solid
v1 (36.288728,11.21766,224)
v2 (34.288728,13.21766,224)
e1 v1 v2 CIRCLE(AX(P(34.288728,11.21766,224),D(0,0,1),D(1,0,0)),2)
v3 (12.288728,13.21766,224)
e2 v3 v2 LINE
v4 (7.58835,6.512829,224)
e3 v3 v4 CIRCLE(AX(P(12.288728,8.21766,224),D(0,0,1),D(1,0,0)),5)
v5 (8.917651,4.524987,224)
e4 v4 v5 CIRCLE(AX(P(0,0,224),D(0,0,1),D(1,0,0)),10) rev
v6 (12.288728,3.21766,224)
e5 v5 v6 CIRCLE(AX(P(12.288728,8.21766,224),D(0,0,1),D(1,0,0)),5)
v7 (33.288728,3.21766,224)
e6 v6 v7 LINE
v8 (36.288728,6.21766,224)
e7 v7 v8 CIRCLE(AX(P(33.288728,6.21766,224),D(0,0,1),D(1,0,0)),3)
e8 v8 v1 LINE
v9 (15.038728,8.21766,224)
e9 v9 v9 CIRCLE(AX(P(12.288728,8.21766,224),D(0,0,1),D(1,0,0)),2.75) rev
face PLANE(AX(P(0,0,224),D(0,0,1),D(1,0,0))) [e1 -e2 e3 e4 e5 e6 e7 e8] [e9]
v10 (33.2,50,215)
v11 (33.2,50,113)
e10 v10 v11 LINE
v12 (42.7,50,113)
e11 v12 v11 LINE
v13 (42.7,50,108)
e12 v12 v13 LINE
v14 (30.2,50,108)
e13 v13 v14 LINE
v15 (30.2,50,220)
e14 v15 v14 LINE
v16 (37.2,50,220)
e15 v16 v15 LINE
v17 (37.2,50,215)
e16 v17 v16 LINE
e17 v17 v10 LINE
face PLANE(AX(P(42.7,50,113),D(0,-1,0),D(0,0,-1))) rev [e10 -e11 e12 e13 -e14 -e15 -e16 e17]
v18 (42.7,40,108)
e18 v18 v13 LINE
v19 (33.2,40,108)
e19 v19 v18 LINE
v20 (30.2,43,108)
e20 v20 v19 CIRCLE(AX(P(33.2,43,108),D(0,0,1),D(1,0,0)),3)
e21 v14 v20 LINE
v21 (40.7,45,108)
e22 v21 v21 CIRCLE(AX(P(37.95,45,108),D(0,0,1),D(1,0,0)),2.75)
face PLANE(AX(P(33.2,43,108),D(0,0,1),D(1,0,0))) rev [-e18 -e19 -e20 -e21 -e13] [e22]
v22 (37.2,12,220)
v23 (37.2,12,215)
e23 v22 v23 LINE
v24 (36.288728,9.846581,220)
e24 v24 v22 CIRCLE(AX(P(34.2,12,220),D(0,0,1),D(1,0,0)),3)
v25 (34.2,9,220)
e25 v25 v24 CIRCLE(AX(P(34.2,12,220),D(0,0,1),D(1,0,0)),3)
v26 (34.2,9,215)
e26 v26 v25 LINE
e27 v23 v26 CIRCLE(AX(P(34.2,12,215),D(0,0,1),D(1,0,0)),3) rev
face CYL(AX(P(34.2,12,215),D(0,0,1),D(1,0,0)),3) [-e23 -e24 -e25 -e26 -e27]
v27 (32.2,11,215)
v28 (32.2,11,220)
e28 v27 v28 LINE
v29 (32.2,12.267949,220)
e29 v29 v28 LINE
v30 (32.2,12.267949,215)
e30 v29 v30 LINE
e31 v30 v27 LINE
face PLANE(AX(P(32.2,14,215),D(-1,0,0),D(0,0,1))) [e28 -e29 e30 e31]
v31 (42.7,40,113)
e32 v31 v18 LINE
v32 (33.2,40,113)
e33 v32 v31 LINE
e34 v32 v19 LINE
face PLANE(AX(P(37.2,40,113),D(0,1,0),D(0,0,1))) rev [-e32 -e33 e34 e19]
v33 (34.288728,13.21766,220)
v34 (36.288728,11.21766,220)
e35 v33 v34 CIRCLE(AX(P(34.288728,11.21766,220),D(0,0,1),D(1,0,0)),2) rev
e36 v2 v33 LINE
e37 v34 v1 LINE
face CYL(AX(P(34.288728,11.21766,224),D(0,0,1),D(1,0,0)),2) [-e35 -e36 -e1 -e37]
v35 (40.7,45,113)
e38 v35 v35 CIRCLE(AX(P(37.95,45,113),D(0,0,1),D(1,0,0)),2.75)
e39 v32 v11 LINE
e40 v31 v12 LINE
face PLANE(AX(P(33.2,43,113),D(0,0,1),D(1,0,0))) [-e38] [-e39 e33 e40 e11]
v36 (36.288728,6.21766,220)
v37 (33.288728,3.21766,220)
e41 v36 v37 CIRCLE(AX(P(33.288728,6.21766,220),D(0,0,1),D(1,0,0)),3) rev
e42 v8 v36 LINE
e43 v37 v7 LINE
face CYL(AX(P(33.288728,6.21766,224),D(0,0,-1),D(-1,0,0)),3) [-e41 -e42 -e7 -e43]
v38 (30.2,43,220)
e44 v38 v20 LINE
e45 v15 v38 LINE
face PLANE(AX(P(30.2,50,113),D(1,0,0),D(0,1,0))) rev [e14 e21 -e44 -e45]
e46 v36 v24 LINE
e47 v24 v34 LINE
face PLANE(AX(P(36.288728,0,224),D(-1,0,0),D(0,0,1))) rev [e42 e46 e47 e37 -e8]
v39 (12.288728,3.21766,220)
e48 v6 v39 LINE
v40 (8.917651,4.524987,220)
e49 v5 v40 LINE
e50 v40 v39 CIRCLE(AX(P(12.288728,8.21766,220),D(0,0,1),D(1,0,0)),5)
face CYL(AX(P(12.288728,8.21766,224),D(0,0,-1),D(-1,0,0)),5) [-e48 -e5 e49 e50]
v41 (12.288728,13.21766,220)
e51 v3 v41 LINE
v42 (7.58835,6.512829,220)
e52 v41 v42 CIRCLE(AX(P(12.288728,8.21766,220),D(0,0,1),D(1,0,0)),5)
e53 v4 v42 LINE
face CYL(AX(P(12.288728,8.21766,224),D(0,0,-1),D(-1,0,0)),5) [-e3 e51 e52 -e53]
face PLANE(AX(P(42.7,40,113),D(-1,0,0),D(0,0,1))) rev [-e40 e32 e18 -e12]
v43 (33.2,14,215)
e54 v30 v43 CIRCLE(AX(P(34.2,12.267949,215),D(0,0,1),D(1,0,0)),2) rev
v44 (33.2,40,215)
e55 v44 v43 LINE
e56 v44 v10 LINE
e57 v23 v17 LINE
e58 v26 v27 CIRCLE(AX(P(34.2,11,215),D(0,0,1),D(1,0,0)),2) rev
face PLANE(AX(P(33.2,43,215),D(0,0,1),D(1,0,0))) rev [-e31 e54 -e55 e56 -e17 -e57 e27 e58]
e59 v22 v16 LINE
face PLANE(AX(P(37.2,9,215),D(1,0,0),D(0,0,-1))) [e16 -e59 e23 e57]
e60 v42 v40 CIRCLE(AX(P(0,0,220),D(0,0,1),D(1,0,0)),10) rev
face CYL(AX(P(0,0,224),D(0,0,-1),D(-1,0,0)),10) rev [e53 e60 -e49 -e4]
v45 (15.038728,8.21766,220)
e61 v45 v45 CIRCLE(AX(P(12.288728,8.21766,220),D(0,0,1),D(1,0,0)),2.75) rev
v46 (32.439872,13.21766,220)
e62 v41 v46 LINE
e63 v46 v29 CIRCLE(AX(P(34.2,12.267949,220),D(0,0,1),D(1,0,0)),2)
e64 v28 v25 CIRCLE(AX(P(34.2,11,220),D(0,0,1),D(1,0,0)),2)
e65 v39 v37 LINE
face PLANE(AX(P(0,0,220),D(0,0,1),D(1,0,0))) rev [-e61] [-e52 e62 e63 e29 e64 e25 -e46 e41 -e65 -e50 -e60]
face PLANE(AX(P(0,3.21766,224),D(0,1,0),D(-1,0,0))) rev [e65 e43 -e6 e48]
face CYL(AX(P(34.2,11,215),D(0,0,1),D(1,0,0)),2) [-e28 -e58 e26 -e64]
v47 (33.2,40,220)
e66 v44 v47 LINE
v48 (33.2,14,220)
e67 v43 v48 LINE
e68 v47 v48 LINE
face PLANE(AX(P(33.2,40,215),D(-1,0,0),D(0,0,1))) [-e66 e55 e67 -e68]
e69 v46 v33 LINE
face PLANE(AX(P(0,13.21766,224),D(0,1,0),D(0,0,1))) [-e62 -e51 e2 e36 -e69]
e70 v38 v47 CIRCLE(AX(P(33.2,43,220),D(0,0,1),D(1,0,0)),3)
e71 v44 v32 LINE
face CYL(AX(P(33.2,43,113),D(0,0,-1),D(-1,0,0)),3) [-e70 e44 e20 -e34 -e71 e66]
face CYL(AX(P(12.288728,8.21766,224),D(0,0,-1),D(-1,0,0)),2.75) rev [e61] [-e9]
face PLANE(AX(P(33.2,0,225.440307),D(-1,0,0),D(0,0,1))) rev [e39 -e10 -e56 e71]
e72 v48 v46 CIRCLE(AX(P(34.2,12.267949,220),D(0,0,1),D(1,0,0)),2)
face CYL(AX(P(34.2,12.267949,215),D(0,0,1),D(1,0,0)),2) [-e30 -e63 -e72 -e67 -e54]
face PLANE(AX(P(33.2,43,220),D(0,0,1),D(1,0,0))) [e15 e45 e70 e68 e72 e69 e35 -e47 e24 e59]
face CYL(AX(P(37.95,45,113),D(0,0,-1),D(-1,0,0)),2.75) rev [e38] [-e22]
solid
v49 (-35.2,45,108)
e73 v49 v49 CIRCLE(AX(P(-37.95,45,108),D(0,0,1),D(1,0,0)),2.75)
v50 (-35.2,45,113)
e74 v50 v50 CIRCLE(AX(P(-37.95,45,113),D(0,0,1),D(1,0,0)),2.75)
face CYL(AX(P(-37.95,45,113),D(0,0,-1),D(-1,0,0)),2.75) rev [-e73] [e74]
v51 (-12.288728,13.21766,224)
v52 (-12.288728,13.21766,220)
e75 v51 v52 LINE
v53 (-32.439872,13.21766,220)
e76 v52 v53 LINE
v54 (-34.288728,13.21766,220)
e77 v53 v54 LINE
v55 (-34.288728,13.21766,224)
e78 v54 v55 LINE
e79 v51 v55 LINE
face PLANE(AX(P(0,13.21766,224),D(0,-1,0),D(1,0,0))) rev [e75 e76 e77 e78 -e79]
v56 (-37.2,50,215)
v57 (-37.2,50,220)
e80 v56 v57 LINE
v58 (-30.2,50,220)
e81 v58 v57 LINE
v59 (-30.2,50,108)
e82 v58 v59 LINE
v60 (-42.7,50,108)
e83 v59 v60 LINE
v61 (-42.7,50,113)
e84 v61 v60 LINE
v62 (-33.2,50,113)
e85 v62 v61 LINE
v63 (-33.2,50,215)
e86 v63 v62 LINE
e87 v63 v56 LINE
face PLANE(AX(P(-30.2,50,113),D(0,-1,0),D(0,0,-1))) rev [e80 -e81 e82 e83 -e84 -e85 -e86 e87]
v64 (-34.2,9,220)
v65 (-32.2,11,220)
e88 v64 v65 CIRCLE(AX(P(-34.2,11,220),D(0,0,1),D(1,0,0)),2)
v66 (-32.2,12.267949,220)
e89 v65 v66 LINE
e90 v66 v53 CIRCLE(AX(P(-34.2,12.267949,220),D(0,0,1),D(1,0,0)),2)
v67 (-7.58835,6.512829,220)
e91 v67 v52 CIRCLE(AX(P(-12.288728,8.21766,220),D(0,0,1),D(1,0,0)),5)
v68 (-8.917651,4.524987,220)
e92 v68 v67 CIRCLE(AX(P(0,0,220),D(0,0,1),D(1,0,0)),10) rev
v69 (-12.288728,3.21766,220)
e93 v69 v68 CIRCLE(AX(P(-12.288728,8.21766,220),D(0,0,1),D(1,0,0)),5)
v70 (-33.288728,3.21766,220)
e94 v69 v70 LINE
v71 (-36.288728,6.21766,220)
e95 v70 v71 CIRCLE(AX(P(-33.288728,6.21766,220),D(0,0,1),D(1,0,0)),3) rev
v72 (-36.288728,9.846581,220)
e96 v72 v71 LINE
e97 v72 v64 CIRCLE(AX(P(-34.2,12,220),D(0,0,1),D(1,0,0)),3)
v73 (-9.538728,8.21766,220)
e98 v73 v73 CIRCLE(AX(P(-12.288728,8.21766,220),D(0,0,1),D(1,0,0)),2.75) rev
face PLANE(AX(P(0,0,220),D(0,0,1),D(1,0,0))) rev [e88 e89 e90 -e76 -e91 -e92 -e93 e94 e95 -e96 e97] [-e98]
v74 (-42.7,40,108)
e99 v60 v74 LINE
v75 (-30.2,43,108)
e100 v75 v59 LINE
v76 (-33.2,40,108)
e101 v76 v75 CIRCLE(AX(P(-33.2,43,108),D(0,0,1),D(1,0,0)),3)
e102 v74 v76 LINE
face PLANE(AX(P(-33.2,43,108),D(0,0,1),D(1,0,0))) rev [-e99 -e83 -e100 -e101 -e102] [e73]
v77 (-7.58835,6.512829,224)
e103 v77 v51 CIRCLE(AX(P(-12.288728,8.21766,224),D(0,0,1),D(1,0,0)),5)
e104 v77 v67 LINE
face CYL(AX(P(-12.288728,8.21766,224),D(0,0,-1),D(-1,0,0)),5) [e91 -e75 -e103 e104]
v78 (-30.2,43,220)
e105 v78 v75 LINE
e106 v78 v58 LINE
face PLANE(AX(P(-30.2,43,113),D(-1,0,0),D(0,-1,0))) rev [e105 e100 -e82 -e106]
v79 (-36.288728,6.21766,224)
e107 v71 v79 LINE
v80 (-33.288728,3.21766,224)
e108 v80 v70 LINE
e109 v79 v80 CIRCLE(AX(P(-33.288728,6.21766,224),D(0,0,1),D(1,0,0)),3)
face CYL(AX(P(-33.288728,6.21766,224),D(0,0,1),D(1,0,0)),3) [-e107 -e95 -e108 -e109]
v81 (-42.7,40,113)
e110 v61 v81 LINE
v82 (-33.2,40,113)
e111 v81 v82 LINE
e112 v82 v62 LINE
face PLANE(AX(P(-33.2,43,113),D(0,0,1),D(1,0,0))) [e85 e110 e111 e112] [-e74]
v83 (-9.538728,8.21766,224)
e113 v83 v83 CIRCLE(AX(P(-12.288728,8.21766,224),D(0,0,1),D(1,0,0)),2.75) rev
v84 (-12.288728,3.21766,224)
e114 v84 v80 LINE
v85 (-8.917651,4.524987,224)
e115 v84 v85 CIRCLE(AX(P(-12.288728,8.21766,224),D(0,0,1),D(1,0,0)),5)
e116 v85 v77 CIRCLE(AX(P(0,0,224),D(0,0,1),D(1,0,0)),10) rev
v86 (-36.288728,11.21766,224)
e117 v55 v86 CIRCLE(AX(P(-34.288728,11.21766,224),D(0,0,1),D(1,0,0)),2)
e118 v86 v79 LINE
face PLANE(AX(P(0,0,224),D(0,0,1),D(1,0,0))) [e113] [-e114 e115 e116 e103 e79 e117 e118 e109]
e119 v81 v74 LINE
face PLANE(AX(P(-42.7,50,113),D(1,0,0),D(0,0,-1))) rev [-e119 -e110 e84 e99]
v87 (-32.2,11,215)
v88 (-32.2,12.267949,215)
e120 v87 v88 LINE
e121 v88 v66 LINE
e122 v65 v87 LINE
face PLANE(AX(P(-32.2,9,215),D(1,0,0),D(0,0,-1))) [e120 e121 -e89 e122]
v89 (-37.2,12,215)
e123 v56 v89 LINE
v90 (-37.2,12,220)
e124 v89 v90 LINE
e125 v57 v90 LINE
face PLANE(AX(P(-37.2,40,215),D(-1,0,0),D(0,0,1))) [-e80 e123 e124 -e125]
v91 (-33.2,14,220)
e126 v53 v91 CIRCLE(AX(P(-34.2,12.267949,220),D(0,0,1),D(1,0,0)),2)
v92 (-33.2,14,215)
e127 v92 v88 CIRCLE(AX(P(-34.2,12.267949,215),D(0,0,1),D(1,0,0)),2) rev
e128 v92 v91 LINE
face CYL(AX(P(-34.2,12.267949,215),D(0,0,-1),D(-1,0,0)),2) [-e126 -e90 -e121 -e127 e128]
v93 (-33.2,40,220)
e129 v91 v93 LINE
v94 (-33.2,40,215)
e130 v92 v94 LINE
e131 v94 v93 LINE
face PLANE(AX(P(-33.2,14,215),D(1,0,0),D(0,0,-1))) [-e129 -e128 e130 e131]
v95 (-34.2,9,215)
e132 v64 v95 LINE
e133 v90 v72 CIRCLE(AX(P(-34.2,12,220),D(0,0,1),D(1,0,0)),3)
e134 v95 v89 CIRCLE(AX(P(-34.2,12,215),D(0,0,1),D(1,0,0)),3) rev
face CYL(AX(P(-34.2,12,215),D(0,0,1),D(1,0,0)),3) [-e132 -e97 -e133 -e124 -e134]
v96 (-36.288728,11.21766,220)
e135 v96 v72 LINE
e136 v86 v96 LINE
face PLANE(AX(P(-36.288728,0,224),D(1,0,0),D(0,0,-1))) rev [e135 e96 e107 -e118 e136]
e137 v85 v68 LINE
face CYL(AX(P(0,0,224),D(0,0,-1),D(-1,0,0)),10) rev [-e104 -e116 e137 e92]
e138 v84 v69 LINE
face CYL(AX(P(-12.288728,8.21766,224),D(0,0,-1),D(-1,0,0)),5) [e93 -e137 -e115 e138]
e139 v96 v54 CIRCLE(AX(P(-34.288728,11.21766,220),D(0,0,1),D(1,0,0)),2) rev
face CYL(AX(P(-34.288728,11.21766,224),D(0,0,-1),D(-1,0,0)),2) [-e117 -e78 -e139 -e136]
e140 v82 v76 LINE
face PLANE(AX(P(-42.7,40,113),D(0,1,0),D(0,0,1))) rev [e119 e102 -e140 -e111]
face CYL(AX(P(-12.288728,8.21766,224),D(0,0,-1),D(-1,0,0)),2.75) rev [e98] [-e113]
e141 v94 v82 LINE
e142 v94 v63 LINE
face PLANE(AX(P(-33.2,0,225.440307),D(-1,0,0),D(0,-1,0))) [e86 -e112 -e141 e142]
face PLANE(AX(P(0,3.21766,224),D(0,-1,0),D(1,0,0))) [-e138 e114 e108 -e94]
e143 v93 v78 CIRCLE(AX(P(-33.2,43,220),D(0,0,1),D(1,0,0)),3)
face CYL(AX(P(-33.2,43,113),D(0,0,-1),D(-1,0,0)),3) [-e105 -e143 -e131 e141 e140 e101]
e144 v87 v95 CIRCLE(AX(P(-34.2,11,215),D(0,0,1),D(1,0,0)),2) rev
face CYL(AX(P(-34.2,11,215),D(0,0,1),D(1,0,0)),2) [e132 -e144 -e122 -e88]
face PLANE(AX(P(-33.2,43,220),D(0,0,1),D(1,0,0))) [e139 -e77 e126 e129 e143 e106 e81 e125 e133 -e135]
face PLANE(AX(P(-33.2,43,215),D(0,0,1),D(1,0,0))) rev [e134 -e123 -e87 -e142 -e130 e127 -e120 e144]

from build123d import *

# Parameters (mm, degrees)
SKETCH1_R               = 2.75
BOSS_EXTRUDE1_DEPTH     = 5
BOSS_EXTRUDE1_2_DEPTH   = 5
BOSS_EXTRUDE2_DEPTH     = 5
BOSS_EXTRUDE2_2_DEPTH   = 5
BOSS_EXTRUDE3_DEPTH     = 102
SKETCH4_W               = 5.5
SKETCH4_H               = 10
CUT_EXTRUDE1_DEPTH      = 5
BOSS_EXTRUDE4_OUTLINE_R = 2.75
BOSS_EXTRUDE4_DEPTH     = 4
FILLET1_R               = 3
FILLET2_R               = 3
FILLET3_R               = 2
FILLET4_R               = 2
FILLET5_R               = 2
FILLET6_R               = 2
FILLET7_R               = 2
FILLET8_R               = 2
CUT_EXTRUDE2_DEPTH      = 5


# Read off the part's stored shape, not the designer's step: Boss-Extrude4
# Some blends are built 0.0001 mm under size
with BuildPart() as part:
    # Sketch1 → Boss-Extrude1 (new body)
    with BuildSketch(Plane.XY.offset(108)):
        with BuildLine():
            Line((30.2, 50), (30.2, 43))
            ThreePointArc((30.2, 43), (31.078679656, 40.878679656), (33.2, 40))
            Line((33.2, 40), (33.2, 14))
            Line((33.2, 14), (32.2, 14))
            Line((32.2, 14), (32.2, 9))
            Line((32.2, 9), (37.2, 9))
            Line((37.2, 9), (37.2, 40))
            Line((37.2, 40), (42.7, 40))
            Line((42.7, 40), (42.7, 50))
            Line((42.7, 50), (30.2, 50))
        make_face()
        with Locations((37.95, 45)):
            Circle(SKETCH1_R, mode=Mode.SUBTRACT)
    extrude(amount=BOSS_EXTRUDE1_DEPTH)



with BuildPart() as body_2:
    # Sketch1 → Boss-Extrude1 2 (new body)
    with BuildSketch(Plane.XY.offset(108)):
        with BuildLine():
            Line((-37.2, 40), (-37.2, 9))
            Line((-37.2, 9), (-32.2, 9))
            Line((-32.2, 9), (-32.2, 14))
            Line((-32.2, 14), (-33.2, 14))
            Line((-33.2, 14), (-33.2, 40))
            ThreePointArc((-33.2, 40), (-31.078679656, 40.878679656), (-30.2, 43))
            Line((-30.2, 43), (-30.2, 50))
            Line((-30.2, 50), (-42.7, 50))
            Line((-42.7, 50), (-42.7, 40))
            Line((-42.7, 40), (-37.2, 40))
        make_face()
        with Locations((-37.95, 45)):
            Circle(SKETCH1_R, mode=Mode.SUBTRACT)
    extrude(amount=BOSS_EXTRUDE1_2_DEPTH)


with BuildPart() as body_3:
    # Sketch2 → Boss-Extrude2 (new body)
    with BuildSketch(Plane.XY.offset(220)):
        with BuildLine():
            Line((42.7, 50), (30.2, 50))
            Line((30.2, 50), (30.2, 43))
            ThreePointArc((30.2, 43), (31.078679656, 40.878679656), (33.2, 40))
            Line((33.2, 40), (33.2, 14))
            Line((33.2, 14), (32.2, 14))
            Line((32.2, 14), (32.2, 9))
            Line((32.2, 9), (37.2, 9))
            Line((37.2, 9), (37.2, 40))
            Line((37.2, 40), (42.7, 40))
            Line((42.7, 40), (42.7, 50))
        make_face()
    extrude(amount=-BOSS_EXTRUDE2_DEPTH)


with BuildPart() as body_4:
    # Sketch2 → Boss-Extrude2 2 (new body)
    with BuildSketch(Plane.XY.offset(220)):
        with BuildLine():
            Line((-42.7, 40), (-37.2, 40))
            Line((-37.2, 40), (-37.2, 9))
            Line((-37.2, 9), (-32.2, 9))
            Line((-32.2, 9), (-32.2, 14))
            Line((-32.2, 14), (-33.2, 14))
            Line((-33.2, 14), (-33.2, 40))
            ThreePointArc((-33.2, 40), (-31.078679656, 40.878679656), (-30.2, 43))
            Line((-30.2, 43), (-30.2, 50))
            Line((-30.2, 50), (-42.7, 50))
            Line((-42.7, 50), (-42.7, 40))
        make_face()
    extrude(amount=-BOSS_EXTRUDE2_2_DEPTH)


with BuildPart() as part_1:
    add(part.part)

    add(body_2.part)  # Boss-Extrude3 merges body 2

    add(body_3.part)  # Boss-Extrude3 merges body 3

    add(body_4.part)  # Boss-Extrude3 merges body 4
    # Sketch3 → Boss-Extrude3 (add)
    with BuildSketch(Plane.XY.offset(113)):
        with BuildLine():
            ThreePointArc((30.2, 43), (31.078679656, 40.878679656), (33.2, 40))
            Line((33.2, 40), (33.2, 50))
            Line((33.2, 50), (30.2, 50))
            Line((30.2, 50), (30.2, 43))
        make_face()
        with BuildLine():
            Line((-33.2, 50), (-33.2, 40))
            ThreePointArc((-33.2, 40), (-31.078679656, 40.878679656), (-30.2, 43))
            Line((-30.2, 43), (-30.2, 50))
            Line((-30.2, 50), (-33.2, 50))
        make_face()
    extrude(amount=BOSS_EXTRUDE3_DEPTH)

    # Sketch4 → Cut-Extrude1 (cut)
    with BuildSketch(Plane.XY.offset(220)):
        with Locations((-39.95, 45)):
            Rectangle(SKETCH4_W, SKETCH4_H)
        with Locations((39.95, 45)):
            Rectangle(SKETCH4_W, SKETCH4_H)
    extrude(amount=-CUT_EXTRUDE1_DEPTH, mode=Mode.SUBTRACT)

    # Boss-Extrude4 outline → Boss-Extrude4 (add)
    # profile 1 of 2: a face of its own
    with BuildSketch(Plane.XY.offset(220)):
        with BuildLine():
            ThreePointArc((-7.588350384, 6.512828759), (-8.194576251, 11.087838135), (-12.288728005, 13.217660193))
            Line((-12.288728005, 13.217660193), (-36.288728005, 13.217660193))
            Line((-36.288728005, 13.217660193), (-36.288728005, 3.217660193))
            Line((-36.288728005, 3.217660193), (-12.288728005, 3.217660193))
            ThreePointArc((-12.288728005, 3.217660193), (-10.480879624, 3.555934737), (-8.917650877, 4.524986502))
            ThreePointArc((-8.917650877, 4.524986502), (-8.312634878, 5.558785963), (-7.588350384, 6.512828759))
        make_face()
        with Locations((-12.288728005, 8.217660193)):
            Circle(BOSS_EXTRUDE4_OUTLINE_R, mode=Mode.SUBTRACT)
    # profile 2 of 2: a face of its own
    with BuildSketch(Plane.XY.offset(220)):
        with BuildLine():
            Line((36.288728005, 3.217660193), (36.288728005, 13.217660193))
            Line((36.288728005, 13.217660193), (12.288728005, 13.217660193))
            ThreePointArc((12.288728005, 13.217660193), (8.194576251, 11.087838135), (7.588350384, 6.512828759))
            ThreePointArc((7.588350384, 6.512828759), (8.312634878, 5.558785963), (8.917650877, 4.524986502))
            ThreePointArc((8.917650877, 4.524986502), (10.480879624, 3.555934737), (12.288728005, 3.217660193))
            Line((12.288728005, 3.217660193), (36.288728005, 3.217660193))
        make_face()
        with Locations((12.288728005, 8.217660193)):
            Circle(BOSS_EXTRUDE4_OUTLINE_R, mode=Mode.SUBTRACT)
    extrude(amount=BOSS_EXTRUDE4_DEPTH)

    # Fillet1
    # the kernel refuses this fillet: 3 mm, written as the material it takes off along each edge
    with BuildSketch(Plane(origin=(-37.2, 9, 220), x_dir=(0, 1, 0), z_dir=(0, 0, -1))) as fillet1_piece_1:
        with BuildLine():
            CenterArc((FILLET1_R, FILLET1_R), FILLET1_R, 180, 90)
            Line((0, FILLET1_R), (0, 0))
            Line((0, 0), (FILLET1_R, 0))
        make_face()
    extrude(amount=12.5, mode=Mode.SUBTRACT)
    with BuildSketch(Plane(origin=(-36.288728005, 3.217660193, 212.5), x_dir=(0, 1, 0), z_dir=(0, 0, 1))) as fillet1_piece_2:
        with BuildLine():
            CenterArc((FILLET1_R, -FILLET1_R), FILLET1_R, 90, 90)
            Line((0, -FILLET1_R), (0, 0))
            Line((0, 0), (FILLET1_R, 0))
        make_face()
    extrude(amount=19, mode=Mode.SUBTRACT)

    # Fillet2
    # the kernel refuses this fillet: 3 mm, written as the material it takes off along each edge
    with BuildSketch(Plane(origin=(37.2, 9, 220), x_dir=(0, 1, 0), z_dir=(0, 0, -1))) as fillet2_piece_1:
        with BuildLine():
            CenterArc((FILLET2_R, -FILLET2_R), FILLET2_R, 90, 90)
            Line((0, -FILLET2_R), (0, 0))
            Line((0, 0), (FILLET2_R, 0))
        make_face()
    extrude(amount=12.5, mode=Mode.SUBTRACT)
    with BuildSketch(Plane(origin=(36.288728005, 3.217660193, 212.5), x_dir=(-1, 0, 0), z_dir=(0, 0, 1))) as fillet2_piece_2:
        with BuildLine():
            CenterArc((FILLET2_R, -FILLET2_R), FILLET2_R, 90, 90)
            Line((0, -FILLET2_R), (0, 0))
            Line((0, 0), (FILLET2_R, 0))
        make_face()
    extrude(amount=19, mode=Mode.SUBTRACT)

    # Fillet3
    fillet3_edges = [part_1.edges().sort_by_distance(p)[0] for p in [
        (36.288728005, 13.217660193, 222),
    ]]
    fillet(fillet3_edges, radius=FILLET3_R)

    # Fillet4
    fillet4_edges = [part_1.edges().sort_by_distance(p)[0] for p in [
        (-36.288728005, 13.217660193, 222),
    ]]
    fillet(fillet4_edges, radius=FILLET4_R)

    # Fillet5
    # the kernel refuses this fillet: 2 mm, written as the material it takes off along each edge
    with BuildSketch(Plane(origin=(-32.2, 14, 220), x_dir=(0, -1, 0), z_dir=(0, 0, -1))) as fillet5_piece_1:
        with BuildLine():
            CenterArc((1.732050808, 2), FILLET5_R, 210, 60)
            Line((0, 1), (-0.034641016, 0.98))
            ThreePointArc((-0.034641016, 0.98), (-0.04, 0.5), (-0.04, 0))
            Line((-0.04, 0), (0, -0.04))
            Line((0, -0.04), (1.732050808, -0.04))
            Line((1.732050808, -0.04), (1.732050808, 0))
        make_face()
    extrude(amount=9.330127019, mode=Mode.SUBTRACT)

    # Fillet6
    # the kernel refuses this fillet: 2 mm, written as the material it takes off along each edge
    with BuildSketch(Plane(origin=(32.2, 14, 220), x_dir=(1, 0, 0), z_dir=(0, 0, -1))) as fillet6_piece_1:
        with BuildLine():
            CenterArc((2, 1.732050808), FILLET6_R, 180, 60)
            Line((0, 1.732050808), (-0.04, 1.732050808))
            Line((-0.04, 1.732050808), (-0.04, 0))
            Line((-0.04, 0), (0, -0.04))
            ThreePointArc((0, -0.04), (0.5, -0.04), (0.98, -0.034641016))
            Line((0.98, -0.034641016), (1, 0))
        make_face()
    extrude(amount=9.330127019, mode=Mode.SUBTRACT)

    # Fillet7
    fillet7_edges = [part_1.edges().sort_by_distance(p)[0] for p in [
        (32.2, 9, 217.5),
    ]]
    fillet(fillet7_edges, radius=FILLET7_R - 0.0001)  # a hair under: the kernel refuses the full size

    # Fillet8
    fillet8_edges = [part_1.edges().sort_by_distance(p)[0] for p in [
        (-32.2, 9, 217.5),
    ]]
    fillet(fillet8_edges, radius=FILLET8_R - 0.0001)  # a hair under: the kernel refuses the full size

    # Sketch7 → Cut-Extrude2 (cut)
    with BuildSketch(Plane.XY.offset(113)):
        Polygon((-33.2, 40), (-37.2, 40), (-37.2, 9), (-32.2, 9), (-32.2, 14), (-33.2, 14), align=None)
        Polygon((32.2, 9), (37.2, 9), (37.2, 40), (33.2, 40), (33.2, 14), (32.2, 14), align=None)
    extrude(amount=-CUT_EXTRUDE2_DEPTH, mode=Mode.SUBTRACT)


solid = part_1.part
